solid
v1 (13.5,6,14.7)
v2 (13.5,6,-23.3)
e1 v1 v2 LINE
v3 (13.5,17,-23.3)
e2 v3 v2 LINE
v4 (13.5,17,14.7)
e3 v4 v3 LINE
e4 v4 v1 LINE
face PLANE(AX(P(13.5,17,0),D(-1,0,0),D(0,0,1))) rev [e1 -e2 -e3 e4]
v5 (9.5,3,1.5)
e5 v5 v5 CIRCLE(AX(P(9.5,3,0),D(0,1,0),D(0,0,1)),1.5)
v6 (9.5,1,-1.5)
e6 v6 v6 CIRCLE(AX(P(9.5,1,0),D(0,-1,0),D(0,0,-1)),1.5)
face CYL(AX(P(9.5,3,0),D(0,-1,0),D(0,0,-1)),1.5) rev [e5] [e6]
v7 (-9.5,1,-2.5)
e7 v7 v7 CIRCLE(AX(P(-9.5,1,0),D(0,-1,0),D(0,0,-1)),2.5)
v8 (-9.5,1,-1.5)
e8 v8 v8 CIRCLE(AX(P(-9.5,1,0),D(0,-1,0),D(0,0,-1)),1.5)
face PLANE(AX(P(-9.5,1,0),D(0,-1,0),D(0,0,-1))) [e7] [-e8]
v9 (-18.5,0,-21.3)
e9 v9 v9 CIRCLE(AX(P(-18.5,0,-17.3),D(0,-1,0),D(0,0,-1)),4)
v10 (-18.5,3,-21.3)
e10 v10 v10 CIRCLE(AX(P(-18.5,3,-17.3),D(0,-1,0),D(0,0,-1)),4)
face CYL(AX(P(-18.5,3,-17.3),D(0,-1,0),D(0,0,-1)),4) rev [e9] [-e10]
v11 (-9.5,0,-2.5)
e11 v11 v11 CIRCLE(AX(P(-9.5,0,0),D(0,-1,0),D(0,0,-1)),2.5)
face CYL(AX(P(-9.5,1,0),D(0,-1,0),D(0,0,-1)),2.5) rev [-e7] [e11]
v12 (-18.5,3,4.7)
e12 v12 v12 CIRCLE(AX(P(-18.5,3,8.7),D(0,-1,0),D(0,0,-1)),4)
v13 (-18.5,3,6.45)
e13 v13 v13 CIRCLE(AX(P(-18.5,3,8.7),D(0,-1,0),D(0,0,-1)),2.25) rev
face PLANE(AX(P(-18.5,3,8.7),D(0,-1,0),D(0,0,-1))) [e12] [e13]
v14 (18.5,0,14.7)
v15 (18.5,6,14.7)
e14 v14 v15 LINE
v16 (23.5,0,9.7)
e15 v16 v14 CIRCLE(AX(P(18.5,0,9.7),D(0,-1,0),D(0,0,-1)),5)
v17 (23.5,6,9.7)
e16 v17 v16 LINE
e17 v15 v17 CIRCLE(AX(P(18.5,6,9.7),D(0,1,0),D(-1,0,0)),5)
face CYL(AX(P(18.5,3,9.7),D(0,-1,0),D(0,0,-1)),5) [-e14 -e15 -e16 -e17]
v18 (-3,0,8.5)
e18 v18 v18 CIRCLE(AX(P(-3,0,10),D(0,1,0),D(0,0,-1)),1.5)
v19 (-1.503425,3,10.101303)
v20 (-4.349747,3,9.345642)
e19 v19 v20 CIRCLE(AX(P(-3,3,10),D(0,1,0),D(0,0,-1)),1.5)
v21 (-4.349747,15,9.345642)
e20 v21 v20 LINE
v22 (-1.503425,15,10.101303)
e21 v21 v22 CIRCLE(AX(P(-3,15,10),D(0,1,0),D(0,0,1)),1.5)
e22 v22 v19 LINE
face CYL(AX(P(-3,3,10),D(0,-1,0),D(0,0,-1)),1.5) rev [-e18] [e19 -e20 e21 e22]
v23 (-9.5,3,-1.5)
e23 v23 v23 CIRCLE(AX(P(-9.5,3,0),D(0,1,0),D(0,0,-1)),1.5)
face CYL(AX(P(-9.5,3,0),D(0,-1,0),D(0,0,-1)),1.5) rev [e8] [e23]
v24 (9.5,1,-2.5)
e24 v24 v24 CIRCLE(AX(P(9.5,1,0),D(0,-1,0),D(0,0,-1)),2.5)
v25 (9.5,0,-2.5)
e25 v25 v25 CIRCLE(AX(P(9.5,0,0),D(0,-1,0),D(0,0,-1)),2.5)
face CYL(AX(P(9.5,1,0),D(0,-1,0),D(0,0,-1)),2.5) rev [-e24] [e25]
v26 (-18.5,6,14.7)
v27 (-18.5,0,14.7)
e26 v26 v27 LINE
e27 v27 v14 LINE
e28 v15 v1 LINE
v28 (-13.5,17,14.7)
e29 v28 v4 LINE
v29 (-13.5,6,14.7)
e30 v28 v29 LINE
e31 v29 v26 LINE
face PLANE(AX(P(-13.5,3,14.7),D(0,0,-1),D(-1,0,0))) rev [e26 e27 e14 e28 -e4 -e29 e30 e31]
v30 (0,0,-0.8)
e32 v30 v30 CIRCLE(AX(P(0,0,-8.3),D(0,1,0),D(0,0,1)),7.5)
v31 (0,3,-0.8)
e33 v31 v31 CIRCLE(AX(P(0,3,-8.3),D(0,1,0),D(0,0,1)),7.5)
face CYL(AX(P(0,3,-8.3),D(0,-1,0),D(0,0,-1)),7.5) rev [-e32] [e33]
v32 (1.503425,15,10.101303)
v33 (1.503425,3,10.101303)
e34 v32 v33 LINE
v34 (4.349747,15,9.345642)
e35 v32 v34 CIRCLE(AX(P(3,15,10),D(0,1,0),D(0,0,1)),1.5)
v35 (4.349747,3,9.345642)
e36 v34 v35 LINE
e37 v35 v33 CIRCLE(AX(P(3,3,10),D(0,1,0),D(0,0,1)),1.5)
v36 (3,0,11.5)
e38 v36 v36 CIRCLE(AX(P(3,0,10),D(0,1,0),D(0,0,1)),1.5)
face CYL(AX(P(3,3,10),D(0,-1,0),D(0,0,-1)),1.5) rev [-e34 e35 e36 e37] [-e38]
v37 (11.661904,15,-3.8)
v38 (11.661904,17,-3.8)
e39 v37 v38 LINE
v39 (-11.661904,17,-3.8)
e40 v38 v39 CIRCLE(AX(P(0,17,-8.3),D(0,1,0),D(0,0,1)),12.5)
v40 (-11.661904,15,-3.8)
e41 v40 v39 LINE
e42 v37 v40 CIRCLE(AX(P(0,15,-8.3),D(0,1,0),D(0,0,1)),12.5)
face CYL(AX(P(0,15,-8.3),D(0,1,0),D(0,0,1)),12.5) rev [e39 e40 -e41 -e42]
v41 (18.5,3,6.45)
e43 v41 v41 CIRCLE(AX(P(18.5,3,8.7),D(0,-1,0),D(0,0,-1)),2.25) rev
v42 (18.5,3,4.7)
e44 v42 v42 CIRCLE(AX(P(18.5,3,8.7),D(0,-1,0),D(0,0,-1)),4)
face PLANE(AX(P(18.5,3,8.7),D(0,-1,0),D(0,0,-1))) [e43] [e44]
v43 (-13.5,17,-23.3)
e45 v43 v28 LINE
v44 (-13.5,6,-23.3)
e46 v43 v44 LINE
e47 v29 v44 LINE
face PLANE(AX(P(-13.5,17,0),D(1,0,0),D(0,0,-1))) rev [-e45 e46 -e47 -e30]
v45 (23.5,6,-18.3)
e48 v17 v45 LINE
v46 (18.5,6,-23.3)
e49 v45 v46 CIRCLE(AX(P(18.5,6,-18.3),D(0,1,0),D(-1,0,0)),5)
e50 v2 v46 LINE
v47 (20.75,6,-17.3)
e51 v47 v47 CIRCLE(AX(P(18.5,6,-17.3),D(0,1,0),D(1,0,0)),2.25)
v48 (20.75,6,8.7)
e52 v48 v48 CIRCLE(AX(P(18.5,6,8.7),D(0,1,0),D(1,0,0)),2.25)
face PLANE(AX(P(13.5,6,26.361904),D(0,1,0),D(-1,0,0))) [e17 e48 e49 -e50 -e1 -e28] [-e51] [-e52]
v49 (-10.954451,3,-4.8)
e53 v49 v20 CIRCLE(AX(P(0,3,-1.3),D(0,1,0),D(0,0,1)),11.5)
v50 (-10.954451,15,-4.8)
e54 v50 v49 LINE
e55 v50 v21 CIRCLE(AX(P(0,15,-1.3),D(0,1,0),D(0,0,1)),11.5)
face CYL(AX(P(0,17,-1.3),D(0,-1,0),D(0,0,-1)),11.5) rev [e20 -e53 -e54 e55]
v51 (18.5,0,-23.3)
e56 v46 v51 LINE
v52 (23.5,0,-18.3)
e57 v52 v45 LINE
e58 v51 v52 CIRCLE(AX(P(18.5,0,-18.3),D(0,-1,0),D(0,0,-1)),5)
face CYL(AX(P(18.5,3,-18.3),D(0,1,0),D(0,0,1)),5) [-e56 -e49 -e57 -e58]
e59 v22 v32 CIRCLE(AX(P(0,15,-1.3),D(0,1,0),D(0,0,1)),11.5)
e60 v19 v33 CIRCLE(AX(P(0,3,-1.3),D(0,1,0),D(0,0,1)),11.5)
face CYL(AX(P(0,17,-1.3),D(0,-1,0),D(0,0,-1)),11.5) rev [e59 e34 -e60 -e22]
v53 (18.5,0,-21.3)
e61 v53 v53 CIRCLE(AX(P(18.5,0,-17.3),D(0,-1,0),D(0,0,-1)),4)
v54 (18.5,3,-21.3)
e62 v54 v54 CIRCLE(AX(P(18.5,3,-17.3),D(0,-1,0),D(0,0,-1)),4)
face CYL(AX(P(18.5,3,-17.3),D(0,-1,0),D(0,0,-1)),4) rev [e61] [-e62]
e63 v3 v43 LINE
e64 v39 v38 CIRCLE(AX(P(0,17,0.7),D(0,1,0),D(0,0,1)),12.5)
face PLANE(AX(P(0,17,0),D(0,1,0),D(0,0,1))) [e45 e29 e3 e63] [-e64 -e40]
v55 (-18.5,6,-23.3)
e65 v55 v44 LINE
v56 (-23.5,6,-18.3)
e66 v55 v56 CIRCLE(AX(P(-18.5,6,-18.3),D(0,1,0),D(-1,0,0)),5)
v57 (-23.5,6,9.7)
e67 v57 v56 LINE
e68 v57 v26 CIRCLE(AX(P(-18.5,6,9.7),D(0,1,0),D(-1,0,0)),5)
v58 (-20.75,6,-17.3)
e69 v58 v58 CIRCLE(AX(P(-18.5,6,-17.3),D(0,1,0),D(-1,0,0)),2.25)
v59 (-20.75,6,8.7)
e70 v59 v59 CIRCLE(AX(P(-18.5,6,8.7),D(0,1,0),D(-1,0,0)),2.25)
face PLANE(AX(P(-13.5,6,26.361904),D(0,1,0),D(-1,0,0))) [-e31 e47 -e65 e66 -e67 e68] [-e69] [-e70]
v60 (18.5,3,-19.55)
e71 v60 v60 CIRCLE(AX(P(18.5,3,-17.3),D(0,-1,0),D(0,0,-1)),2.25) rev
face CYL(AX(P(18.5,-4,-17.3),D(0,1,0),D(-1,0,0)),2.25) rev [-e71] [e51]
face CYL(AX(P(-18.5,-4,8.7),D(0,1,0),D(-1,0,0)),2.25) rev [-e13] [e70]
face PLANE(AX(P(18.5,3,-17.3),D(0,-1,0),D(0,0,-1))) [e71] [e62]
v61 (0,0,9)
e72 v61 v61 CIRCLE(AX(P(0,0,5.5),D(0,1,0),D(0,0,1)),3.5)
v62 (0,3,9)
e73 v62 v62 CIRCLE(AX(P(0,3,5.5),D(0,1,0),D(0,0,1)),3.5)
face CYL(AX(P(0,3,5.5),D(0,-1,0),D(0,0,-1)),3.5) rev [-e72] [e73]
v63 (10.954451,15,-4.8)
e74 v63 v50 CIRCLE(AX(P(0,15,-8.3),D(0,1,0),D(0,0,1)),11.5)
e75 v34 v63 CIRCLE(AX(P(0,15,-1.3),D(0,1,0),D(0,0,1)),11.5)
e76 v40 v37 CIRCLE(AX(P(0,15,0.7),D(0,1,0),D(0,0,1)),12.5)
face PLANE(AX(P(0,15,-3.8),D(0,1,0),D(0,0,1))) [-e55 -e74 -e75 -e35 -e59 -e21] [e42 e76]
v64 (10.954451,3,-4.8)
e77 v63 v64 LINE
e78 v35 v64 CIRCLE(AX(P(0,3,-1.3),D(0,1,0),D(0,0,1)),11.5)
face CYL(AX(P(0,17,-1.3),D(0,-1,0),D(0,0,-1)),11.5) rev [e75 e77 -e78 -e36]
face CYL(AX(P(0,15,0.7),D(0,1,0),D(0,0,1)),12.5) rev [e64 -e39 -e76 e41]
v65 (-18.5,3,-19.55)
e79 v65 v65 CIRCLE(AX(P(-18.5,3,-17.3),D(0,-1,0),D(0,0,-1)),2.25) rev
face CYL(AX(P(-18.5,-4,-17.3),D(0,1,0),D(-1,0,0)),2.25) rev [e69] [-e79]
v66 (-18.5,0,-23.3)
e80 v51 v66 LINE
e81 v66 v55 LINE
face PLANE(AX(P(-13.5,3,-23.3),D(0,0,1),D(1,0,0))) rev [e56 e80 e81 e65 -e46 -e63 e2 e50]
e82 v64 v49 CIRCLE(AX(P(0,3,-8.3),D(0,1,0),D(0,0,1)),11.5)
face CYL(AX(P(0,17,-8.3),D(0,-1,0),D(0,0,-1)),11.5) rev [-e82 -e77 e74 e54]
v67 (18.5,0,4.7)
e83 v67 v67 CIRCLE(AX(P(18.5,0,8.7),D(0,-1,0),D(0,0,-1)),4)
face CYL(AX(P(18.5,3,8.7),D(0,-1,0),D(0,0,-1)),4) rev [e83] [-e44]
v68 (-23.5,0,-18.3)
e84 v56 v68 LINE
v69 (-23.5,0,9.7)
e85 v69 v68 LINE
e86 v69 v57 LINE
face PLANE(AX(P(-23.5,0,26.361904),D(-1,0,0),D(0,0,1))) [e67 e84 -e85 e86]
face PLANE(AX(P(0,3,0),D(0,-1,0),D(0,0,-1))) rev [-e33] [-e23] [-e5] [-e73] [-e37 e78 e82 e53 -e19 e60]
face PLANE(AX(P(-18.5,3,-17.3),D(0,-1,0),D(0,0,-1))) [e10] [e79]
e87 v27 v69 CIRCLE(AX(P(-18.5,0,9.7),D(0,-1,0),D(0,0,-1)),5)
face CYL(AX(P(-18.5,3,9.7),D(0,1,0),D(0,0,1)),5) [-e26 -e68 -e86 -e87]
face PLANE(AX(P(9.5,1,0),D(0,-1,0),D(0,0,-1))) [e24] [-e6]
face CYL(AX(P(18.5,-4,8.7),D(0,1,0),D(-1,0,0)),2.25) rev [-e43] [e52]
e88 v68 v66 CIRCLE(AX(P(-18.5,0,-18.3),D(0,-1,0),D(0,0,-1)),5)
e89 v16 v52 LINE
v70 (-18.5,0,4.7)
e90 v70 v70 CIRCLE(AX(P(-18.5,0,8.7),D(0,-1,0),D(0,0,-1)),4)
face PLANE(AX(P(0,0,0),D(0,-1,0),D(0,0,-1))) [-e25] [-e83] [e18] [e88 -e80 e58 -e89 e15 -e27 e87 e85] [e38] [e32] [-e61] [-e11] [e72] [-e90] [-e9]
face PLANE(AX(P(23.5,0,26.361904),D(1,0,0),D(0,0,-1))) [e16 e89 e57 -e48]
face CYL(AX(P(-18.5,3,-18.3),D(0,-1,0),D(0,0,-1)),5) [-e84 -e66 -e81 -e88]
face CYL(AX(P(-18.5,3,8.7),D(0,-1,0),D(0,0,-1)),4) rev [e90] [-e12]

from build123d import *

# Parameters (mm, degrees)
SKETCH_1_W          = 27
SKETCH_1_H          = 38
SKETCH_1_R          = 7.5
SKETCH_1_R_2        = 3.5
SKETCH_1_R_3        = 1.5
EXTRUDE_1_DEPTH     = 3
SKETCH_4_W          = 10
SKETCH_4_H          = 6
EXTRUDE_3_DEPTH     = 38
SKETCH_6_R          = 2.5
CUT_EXTRUDE_3_DEPTH = 1
EXTRUDE_4_OUTLINE_W = 27
EXTRUDE_4_OUTLINE_H = 38
EXTRUDE_4_DEPTH     = 14
SKETCH_13_R         = 2.25
CUT_EXTRUDE_6_DEPTH = 10
CUT_EXTRUDE_8_DEPTH = 2
FILLET_1_R          = 5
SKETCH_17_R         = 4
CUT_EXTRUDE_9_DEPTH = 3


# Read off the part's stored shape, not the designer's step: 凸台-拉伸4
with BuildPart() as part:
    # 草图1 → 凸台-拉伸1 (new body)
    with BuildSketch(Plane(origin=(0, 0, 0), x_dir=(1, 0, 0), z_dir=(0, 1, 0))):
        with Locations((0, 4.3)):
            Rectangle(SKETCH_1_W, SKETCH_1_H)
        with Locations(Location((0, 8.3, 0), (0, 0, 270))):
            Circle(SKETCH_1_R, mode=Mode.SUBTRACT)
        with Locations(Location((0, -5.5, 0), (0, 0, 270))):
            Circle(SKETCH_1_R_2, mode=Mode.SUBTRACT)
        with Locations(Location((-9.5, 0, 0), (0, 0, 90))):
            Circle(SKETCH_1_R_3, mode=Mode.SUBTRACT)
        with Locations(Location((-3, -10, 0), (0, 0, 90))):
            Circle(SKETCH_1_R_3, mode=Mode.SUBTRACT)
        with Locations(Location((9.5, 0, 0), (0, 0, 270))):
            Circle(SKETCH_1_R_3, mode=Mode.SUBTRACT)
        with Locations(Location((3, -10, 0), (0, 0, 270))):
            Circle(SKETCH_1_R_3, mode=Mode.SUBTRACT)
    extrude(amount=EXTRUDE_1_DEPTH)

    # 草图4 → 凸台-拉伸3 (add)
    with BuildSketch(Plane(origin=(0, 0, -23.3), x_dir=(-1, 0, 0), z_dir=(0, 0, -1))):
        with Locations((-18.5, 3)):
            Rectangle(SKETCH_4_W, SKETCH_4_H)
        with Locations((18.5, 3)):
            Rectangle(SKETCH_4_W, SKETCH_4_H)
    extrude(amount=-EXTRUDE_3_DEPTH)

    # 草图6 → 切除-拉伸3 (cut)
    with BuildSketch(Plane.XZ):
        with Locations(Location((-9.5, 0, 0), (0, 0, 270))):
            Circle(SKETCH_6_R)
        with Locations(Location((9.5, 0, 0), (0, 0, 270))):
            Circle(SKETCH_6_R)
    extrude(amount=-CUT_EXTRUDE_3_DEPTH, mode=Mode.SUBTRACT)

    # 凸台-拉伸4 outline → 凸台-拉伸4 (add)
    with BuildSketch(Plane(origin=(0, 3, 0), x_dir=(1, 0, 0), z_dir=(0, 1, 0))):
        with Locations((0, 4.3)):
            Rectangle(EXTRUDE_4_OUTLINE_W, EXTRUDE_4_OUTLINE_H)
        with BuildLine():
            ThreePointArc((-1.503424688, -10.10130318), (-3.38489666, -11.449777418), (-4.349746722, -9.345642463))
            ThreePointArc((-4.349746722, -9.345642463), (-10.420144831, -3.565242203), (-10.95445115, 4.8))
            ThreePointArc((-10.95445115, 4.8), (0, 19.8), (10.95445115, 4.8))
            ThreePointArc((10.95445115, 4.8), (10.420144831, -3.565242203), (4.349746722, -9.345642463))
            ThreePointArc((4.349746722, -9.345642463), (3.38489666, -11.449777418), (1.503424688, -10.10130318))
            ThreePointArc((1.503424688, -10.10130318), (0, -10.2), (-1.503424688, -10.10130318))
        make_face(mode=Mode.SUBTRACT)
    extrude(amount=EXTRUDE_4_DEPTH)

    # 草图13 → 切除-拉伸6 (cut)
    with BuildSketch(Plane(origin=(0, 6, 0), x_dir=(1, 0, 0), z_dir=(0, 1, 0))):
        with Locations(Location((-18.5, 17.3, 0), (0, 0, 180))):
            Circle(SKETCH_13_R)
        with Locations(Location((-18.5, -8.7, 0), (0, 0, 180))):
            Circle(SKETCH_13_R)
        with Locations(Location((18.5, -8.7, 0), (0, 0, 90))):
            Circle(SKETCH_13_R)
        with Locations(Location((18.5, 17.3, 0), (0, 0, 90))):
            Circle(SKETCH_13_R)
    extrude(amount=-CUT_EXTRUDE_6_DEPTH, mode=Mode.SUBTRACT)

    # 草图15 → 切除-拉伸8 (cut)
    with BuildSketch(Plane(origin=(0, 17, 0), x_dir=(1, 0, 0), z_dir=(0, 1, 0))):
        with BuildLine():
            ThreePointArc((11.66190379, 3.8), (0, 20.8), (-11.66190379, 3.8))
            ThreePointArc((-11.66190379, 3.8), (0, -13.2), (11.66190379, 3.8))
        make_face()
    extrude(amount=-CUT_EXTRUDE_8_DEPTH, mode=Mode.SUBTRACT)

    # 圆角1
    fillet_1_edges = [part.edges().sort_by_distance(p)[0] for p in [
        (23.5, 3, -23.3),
        (23.5, 3, 14.7),
        (-23.5, 3, -23.3),
        (-23.5, 3, 14.7),
    ]]
    fillet(fillet_1_edges, radius=FILLET_1_R)

    # 草图17 → 切除-拉伸9 (cut)
    with BuildSketch(Plane.XZ):
        with Locations(Location((-18.5, 8.7, 0), (0, 0, 270))):
            Circle(SKETCH_17_R)
        with Locations(Location((18.5, 8.7, 0), (0, 0, 270))):
            Circle(SKETCH_17_R)
        with Locations(Location((18.5, -17.3, 0), (0, 0, 270))):
            Circle(SKETCH_17_R)
        with Locations(Location((-18.5, -17.3, 0), (0, 0, 270))):
            Circle(SKETCH_17_R)
    extrude(amount=-CUT_EXTRUDE_9_DEPTH, mode=Mode.SUBTRACT)


solid = part.part
